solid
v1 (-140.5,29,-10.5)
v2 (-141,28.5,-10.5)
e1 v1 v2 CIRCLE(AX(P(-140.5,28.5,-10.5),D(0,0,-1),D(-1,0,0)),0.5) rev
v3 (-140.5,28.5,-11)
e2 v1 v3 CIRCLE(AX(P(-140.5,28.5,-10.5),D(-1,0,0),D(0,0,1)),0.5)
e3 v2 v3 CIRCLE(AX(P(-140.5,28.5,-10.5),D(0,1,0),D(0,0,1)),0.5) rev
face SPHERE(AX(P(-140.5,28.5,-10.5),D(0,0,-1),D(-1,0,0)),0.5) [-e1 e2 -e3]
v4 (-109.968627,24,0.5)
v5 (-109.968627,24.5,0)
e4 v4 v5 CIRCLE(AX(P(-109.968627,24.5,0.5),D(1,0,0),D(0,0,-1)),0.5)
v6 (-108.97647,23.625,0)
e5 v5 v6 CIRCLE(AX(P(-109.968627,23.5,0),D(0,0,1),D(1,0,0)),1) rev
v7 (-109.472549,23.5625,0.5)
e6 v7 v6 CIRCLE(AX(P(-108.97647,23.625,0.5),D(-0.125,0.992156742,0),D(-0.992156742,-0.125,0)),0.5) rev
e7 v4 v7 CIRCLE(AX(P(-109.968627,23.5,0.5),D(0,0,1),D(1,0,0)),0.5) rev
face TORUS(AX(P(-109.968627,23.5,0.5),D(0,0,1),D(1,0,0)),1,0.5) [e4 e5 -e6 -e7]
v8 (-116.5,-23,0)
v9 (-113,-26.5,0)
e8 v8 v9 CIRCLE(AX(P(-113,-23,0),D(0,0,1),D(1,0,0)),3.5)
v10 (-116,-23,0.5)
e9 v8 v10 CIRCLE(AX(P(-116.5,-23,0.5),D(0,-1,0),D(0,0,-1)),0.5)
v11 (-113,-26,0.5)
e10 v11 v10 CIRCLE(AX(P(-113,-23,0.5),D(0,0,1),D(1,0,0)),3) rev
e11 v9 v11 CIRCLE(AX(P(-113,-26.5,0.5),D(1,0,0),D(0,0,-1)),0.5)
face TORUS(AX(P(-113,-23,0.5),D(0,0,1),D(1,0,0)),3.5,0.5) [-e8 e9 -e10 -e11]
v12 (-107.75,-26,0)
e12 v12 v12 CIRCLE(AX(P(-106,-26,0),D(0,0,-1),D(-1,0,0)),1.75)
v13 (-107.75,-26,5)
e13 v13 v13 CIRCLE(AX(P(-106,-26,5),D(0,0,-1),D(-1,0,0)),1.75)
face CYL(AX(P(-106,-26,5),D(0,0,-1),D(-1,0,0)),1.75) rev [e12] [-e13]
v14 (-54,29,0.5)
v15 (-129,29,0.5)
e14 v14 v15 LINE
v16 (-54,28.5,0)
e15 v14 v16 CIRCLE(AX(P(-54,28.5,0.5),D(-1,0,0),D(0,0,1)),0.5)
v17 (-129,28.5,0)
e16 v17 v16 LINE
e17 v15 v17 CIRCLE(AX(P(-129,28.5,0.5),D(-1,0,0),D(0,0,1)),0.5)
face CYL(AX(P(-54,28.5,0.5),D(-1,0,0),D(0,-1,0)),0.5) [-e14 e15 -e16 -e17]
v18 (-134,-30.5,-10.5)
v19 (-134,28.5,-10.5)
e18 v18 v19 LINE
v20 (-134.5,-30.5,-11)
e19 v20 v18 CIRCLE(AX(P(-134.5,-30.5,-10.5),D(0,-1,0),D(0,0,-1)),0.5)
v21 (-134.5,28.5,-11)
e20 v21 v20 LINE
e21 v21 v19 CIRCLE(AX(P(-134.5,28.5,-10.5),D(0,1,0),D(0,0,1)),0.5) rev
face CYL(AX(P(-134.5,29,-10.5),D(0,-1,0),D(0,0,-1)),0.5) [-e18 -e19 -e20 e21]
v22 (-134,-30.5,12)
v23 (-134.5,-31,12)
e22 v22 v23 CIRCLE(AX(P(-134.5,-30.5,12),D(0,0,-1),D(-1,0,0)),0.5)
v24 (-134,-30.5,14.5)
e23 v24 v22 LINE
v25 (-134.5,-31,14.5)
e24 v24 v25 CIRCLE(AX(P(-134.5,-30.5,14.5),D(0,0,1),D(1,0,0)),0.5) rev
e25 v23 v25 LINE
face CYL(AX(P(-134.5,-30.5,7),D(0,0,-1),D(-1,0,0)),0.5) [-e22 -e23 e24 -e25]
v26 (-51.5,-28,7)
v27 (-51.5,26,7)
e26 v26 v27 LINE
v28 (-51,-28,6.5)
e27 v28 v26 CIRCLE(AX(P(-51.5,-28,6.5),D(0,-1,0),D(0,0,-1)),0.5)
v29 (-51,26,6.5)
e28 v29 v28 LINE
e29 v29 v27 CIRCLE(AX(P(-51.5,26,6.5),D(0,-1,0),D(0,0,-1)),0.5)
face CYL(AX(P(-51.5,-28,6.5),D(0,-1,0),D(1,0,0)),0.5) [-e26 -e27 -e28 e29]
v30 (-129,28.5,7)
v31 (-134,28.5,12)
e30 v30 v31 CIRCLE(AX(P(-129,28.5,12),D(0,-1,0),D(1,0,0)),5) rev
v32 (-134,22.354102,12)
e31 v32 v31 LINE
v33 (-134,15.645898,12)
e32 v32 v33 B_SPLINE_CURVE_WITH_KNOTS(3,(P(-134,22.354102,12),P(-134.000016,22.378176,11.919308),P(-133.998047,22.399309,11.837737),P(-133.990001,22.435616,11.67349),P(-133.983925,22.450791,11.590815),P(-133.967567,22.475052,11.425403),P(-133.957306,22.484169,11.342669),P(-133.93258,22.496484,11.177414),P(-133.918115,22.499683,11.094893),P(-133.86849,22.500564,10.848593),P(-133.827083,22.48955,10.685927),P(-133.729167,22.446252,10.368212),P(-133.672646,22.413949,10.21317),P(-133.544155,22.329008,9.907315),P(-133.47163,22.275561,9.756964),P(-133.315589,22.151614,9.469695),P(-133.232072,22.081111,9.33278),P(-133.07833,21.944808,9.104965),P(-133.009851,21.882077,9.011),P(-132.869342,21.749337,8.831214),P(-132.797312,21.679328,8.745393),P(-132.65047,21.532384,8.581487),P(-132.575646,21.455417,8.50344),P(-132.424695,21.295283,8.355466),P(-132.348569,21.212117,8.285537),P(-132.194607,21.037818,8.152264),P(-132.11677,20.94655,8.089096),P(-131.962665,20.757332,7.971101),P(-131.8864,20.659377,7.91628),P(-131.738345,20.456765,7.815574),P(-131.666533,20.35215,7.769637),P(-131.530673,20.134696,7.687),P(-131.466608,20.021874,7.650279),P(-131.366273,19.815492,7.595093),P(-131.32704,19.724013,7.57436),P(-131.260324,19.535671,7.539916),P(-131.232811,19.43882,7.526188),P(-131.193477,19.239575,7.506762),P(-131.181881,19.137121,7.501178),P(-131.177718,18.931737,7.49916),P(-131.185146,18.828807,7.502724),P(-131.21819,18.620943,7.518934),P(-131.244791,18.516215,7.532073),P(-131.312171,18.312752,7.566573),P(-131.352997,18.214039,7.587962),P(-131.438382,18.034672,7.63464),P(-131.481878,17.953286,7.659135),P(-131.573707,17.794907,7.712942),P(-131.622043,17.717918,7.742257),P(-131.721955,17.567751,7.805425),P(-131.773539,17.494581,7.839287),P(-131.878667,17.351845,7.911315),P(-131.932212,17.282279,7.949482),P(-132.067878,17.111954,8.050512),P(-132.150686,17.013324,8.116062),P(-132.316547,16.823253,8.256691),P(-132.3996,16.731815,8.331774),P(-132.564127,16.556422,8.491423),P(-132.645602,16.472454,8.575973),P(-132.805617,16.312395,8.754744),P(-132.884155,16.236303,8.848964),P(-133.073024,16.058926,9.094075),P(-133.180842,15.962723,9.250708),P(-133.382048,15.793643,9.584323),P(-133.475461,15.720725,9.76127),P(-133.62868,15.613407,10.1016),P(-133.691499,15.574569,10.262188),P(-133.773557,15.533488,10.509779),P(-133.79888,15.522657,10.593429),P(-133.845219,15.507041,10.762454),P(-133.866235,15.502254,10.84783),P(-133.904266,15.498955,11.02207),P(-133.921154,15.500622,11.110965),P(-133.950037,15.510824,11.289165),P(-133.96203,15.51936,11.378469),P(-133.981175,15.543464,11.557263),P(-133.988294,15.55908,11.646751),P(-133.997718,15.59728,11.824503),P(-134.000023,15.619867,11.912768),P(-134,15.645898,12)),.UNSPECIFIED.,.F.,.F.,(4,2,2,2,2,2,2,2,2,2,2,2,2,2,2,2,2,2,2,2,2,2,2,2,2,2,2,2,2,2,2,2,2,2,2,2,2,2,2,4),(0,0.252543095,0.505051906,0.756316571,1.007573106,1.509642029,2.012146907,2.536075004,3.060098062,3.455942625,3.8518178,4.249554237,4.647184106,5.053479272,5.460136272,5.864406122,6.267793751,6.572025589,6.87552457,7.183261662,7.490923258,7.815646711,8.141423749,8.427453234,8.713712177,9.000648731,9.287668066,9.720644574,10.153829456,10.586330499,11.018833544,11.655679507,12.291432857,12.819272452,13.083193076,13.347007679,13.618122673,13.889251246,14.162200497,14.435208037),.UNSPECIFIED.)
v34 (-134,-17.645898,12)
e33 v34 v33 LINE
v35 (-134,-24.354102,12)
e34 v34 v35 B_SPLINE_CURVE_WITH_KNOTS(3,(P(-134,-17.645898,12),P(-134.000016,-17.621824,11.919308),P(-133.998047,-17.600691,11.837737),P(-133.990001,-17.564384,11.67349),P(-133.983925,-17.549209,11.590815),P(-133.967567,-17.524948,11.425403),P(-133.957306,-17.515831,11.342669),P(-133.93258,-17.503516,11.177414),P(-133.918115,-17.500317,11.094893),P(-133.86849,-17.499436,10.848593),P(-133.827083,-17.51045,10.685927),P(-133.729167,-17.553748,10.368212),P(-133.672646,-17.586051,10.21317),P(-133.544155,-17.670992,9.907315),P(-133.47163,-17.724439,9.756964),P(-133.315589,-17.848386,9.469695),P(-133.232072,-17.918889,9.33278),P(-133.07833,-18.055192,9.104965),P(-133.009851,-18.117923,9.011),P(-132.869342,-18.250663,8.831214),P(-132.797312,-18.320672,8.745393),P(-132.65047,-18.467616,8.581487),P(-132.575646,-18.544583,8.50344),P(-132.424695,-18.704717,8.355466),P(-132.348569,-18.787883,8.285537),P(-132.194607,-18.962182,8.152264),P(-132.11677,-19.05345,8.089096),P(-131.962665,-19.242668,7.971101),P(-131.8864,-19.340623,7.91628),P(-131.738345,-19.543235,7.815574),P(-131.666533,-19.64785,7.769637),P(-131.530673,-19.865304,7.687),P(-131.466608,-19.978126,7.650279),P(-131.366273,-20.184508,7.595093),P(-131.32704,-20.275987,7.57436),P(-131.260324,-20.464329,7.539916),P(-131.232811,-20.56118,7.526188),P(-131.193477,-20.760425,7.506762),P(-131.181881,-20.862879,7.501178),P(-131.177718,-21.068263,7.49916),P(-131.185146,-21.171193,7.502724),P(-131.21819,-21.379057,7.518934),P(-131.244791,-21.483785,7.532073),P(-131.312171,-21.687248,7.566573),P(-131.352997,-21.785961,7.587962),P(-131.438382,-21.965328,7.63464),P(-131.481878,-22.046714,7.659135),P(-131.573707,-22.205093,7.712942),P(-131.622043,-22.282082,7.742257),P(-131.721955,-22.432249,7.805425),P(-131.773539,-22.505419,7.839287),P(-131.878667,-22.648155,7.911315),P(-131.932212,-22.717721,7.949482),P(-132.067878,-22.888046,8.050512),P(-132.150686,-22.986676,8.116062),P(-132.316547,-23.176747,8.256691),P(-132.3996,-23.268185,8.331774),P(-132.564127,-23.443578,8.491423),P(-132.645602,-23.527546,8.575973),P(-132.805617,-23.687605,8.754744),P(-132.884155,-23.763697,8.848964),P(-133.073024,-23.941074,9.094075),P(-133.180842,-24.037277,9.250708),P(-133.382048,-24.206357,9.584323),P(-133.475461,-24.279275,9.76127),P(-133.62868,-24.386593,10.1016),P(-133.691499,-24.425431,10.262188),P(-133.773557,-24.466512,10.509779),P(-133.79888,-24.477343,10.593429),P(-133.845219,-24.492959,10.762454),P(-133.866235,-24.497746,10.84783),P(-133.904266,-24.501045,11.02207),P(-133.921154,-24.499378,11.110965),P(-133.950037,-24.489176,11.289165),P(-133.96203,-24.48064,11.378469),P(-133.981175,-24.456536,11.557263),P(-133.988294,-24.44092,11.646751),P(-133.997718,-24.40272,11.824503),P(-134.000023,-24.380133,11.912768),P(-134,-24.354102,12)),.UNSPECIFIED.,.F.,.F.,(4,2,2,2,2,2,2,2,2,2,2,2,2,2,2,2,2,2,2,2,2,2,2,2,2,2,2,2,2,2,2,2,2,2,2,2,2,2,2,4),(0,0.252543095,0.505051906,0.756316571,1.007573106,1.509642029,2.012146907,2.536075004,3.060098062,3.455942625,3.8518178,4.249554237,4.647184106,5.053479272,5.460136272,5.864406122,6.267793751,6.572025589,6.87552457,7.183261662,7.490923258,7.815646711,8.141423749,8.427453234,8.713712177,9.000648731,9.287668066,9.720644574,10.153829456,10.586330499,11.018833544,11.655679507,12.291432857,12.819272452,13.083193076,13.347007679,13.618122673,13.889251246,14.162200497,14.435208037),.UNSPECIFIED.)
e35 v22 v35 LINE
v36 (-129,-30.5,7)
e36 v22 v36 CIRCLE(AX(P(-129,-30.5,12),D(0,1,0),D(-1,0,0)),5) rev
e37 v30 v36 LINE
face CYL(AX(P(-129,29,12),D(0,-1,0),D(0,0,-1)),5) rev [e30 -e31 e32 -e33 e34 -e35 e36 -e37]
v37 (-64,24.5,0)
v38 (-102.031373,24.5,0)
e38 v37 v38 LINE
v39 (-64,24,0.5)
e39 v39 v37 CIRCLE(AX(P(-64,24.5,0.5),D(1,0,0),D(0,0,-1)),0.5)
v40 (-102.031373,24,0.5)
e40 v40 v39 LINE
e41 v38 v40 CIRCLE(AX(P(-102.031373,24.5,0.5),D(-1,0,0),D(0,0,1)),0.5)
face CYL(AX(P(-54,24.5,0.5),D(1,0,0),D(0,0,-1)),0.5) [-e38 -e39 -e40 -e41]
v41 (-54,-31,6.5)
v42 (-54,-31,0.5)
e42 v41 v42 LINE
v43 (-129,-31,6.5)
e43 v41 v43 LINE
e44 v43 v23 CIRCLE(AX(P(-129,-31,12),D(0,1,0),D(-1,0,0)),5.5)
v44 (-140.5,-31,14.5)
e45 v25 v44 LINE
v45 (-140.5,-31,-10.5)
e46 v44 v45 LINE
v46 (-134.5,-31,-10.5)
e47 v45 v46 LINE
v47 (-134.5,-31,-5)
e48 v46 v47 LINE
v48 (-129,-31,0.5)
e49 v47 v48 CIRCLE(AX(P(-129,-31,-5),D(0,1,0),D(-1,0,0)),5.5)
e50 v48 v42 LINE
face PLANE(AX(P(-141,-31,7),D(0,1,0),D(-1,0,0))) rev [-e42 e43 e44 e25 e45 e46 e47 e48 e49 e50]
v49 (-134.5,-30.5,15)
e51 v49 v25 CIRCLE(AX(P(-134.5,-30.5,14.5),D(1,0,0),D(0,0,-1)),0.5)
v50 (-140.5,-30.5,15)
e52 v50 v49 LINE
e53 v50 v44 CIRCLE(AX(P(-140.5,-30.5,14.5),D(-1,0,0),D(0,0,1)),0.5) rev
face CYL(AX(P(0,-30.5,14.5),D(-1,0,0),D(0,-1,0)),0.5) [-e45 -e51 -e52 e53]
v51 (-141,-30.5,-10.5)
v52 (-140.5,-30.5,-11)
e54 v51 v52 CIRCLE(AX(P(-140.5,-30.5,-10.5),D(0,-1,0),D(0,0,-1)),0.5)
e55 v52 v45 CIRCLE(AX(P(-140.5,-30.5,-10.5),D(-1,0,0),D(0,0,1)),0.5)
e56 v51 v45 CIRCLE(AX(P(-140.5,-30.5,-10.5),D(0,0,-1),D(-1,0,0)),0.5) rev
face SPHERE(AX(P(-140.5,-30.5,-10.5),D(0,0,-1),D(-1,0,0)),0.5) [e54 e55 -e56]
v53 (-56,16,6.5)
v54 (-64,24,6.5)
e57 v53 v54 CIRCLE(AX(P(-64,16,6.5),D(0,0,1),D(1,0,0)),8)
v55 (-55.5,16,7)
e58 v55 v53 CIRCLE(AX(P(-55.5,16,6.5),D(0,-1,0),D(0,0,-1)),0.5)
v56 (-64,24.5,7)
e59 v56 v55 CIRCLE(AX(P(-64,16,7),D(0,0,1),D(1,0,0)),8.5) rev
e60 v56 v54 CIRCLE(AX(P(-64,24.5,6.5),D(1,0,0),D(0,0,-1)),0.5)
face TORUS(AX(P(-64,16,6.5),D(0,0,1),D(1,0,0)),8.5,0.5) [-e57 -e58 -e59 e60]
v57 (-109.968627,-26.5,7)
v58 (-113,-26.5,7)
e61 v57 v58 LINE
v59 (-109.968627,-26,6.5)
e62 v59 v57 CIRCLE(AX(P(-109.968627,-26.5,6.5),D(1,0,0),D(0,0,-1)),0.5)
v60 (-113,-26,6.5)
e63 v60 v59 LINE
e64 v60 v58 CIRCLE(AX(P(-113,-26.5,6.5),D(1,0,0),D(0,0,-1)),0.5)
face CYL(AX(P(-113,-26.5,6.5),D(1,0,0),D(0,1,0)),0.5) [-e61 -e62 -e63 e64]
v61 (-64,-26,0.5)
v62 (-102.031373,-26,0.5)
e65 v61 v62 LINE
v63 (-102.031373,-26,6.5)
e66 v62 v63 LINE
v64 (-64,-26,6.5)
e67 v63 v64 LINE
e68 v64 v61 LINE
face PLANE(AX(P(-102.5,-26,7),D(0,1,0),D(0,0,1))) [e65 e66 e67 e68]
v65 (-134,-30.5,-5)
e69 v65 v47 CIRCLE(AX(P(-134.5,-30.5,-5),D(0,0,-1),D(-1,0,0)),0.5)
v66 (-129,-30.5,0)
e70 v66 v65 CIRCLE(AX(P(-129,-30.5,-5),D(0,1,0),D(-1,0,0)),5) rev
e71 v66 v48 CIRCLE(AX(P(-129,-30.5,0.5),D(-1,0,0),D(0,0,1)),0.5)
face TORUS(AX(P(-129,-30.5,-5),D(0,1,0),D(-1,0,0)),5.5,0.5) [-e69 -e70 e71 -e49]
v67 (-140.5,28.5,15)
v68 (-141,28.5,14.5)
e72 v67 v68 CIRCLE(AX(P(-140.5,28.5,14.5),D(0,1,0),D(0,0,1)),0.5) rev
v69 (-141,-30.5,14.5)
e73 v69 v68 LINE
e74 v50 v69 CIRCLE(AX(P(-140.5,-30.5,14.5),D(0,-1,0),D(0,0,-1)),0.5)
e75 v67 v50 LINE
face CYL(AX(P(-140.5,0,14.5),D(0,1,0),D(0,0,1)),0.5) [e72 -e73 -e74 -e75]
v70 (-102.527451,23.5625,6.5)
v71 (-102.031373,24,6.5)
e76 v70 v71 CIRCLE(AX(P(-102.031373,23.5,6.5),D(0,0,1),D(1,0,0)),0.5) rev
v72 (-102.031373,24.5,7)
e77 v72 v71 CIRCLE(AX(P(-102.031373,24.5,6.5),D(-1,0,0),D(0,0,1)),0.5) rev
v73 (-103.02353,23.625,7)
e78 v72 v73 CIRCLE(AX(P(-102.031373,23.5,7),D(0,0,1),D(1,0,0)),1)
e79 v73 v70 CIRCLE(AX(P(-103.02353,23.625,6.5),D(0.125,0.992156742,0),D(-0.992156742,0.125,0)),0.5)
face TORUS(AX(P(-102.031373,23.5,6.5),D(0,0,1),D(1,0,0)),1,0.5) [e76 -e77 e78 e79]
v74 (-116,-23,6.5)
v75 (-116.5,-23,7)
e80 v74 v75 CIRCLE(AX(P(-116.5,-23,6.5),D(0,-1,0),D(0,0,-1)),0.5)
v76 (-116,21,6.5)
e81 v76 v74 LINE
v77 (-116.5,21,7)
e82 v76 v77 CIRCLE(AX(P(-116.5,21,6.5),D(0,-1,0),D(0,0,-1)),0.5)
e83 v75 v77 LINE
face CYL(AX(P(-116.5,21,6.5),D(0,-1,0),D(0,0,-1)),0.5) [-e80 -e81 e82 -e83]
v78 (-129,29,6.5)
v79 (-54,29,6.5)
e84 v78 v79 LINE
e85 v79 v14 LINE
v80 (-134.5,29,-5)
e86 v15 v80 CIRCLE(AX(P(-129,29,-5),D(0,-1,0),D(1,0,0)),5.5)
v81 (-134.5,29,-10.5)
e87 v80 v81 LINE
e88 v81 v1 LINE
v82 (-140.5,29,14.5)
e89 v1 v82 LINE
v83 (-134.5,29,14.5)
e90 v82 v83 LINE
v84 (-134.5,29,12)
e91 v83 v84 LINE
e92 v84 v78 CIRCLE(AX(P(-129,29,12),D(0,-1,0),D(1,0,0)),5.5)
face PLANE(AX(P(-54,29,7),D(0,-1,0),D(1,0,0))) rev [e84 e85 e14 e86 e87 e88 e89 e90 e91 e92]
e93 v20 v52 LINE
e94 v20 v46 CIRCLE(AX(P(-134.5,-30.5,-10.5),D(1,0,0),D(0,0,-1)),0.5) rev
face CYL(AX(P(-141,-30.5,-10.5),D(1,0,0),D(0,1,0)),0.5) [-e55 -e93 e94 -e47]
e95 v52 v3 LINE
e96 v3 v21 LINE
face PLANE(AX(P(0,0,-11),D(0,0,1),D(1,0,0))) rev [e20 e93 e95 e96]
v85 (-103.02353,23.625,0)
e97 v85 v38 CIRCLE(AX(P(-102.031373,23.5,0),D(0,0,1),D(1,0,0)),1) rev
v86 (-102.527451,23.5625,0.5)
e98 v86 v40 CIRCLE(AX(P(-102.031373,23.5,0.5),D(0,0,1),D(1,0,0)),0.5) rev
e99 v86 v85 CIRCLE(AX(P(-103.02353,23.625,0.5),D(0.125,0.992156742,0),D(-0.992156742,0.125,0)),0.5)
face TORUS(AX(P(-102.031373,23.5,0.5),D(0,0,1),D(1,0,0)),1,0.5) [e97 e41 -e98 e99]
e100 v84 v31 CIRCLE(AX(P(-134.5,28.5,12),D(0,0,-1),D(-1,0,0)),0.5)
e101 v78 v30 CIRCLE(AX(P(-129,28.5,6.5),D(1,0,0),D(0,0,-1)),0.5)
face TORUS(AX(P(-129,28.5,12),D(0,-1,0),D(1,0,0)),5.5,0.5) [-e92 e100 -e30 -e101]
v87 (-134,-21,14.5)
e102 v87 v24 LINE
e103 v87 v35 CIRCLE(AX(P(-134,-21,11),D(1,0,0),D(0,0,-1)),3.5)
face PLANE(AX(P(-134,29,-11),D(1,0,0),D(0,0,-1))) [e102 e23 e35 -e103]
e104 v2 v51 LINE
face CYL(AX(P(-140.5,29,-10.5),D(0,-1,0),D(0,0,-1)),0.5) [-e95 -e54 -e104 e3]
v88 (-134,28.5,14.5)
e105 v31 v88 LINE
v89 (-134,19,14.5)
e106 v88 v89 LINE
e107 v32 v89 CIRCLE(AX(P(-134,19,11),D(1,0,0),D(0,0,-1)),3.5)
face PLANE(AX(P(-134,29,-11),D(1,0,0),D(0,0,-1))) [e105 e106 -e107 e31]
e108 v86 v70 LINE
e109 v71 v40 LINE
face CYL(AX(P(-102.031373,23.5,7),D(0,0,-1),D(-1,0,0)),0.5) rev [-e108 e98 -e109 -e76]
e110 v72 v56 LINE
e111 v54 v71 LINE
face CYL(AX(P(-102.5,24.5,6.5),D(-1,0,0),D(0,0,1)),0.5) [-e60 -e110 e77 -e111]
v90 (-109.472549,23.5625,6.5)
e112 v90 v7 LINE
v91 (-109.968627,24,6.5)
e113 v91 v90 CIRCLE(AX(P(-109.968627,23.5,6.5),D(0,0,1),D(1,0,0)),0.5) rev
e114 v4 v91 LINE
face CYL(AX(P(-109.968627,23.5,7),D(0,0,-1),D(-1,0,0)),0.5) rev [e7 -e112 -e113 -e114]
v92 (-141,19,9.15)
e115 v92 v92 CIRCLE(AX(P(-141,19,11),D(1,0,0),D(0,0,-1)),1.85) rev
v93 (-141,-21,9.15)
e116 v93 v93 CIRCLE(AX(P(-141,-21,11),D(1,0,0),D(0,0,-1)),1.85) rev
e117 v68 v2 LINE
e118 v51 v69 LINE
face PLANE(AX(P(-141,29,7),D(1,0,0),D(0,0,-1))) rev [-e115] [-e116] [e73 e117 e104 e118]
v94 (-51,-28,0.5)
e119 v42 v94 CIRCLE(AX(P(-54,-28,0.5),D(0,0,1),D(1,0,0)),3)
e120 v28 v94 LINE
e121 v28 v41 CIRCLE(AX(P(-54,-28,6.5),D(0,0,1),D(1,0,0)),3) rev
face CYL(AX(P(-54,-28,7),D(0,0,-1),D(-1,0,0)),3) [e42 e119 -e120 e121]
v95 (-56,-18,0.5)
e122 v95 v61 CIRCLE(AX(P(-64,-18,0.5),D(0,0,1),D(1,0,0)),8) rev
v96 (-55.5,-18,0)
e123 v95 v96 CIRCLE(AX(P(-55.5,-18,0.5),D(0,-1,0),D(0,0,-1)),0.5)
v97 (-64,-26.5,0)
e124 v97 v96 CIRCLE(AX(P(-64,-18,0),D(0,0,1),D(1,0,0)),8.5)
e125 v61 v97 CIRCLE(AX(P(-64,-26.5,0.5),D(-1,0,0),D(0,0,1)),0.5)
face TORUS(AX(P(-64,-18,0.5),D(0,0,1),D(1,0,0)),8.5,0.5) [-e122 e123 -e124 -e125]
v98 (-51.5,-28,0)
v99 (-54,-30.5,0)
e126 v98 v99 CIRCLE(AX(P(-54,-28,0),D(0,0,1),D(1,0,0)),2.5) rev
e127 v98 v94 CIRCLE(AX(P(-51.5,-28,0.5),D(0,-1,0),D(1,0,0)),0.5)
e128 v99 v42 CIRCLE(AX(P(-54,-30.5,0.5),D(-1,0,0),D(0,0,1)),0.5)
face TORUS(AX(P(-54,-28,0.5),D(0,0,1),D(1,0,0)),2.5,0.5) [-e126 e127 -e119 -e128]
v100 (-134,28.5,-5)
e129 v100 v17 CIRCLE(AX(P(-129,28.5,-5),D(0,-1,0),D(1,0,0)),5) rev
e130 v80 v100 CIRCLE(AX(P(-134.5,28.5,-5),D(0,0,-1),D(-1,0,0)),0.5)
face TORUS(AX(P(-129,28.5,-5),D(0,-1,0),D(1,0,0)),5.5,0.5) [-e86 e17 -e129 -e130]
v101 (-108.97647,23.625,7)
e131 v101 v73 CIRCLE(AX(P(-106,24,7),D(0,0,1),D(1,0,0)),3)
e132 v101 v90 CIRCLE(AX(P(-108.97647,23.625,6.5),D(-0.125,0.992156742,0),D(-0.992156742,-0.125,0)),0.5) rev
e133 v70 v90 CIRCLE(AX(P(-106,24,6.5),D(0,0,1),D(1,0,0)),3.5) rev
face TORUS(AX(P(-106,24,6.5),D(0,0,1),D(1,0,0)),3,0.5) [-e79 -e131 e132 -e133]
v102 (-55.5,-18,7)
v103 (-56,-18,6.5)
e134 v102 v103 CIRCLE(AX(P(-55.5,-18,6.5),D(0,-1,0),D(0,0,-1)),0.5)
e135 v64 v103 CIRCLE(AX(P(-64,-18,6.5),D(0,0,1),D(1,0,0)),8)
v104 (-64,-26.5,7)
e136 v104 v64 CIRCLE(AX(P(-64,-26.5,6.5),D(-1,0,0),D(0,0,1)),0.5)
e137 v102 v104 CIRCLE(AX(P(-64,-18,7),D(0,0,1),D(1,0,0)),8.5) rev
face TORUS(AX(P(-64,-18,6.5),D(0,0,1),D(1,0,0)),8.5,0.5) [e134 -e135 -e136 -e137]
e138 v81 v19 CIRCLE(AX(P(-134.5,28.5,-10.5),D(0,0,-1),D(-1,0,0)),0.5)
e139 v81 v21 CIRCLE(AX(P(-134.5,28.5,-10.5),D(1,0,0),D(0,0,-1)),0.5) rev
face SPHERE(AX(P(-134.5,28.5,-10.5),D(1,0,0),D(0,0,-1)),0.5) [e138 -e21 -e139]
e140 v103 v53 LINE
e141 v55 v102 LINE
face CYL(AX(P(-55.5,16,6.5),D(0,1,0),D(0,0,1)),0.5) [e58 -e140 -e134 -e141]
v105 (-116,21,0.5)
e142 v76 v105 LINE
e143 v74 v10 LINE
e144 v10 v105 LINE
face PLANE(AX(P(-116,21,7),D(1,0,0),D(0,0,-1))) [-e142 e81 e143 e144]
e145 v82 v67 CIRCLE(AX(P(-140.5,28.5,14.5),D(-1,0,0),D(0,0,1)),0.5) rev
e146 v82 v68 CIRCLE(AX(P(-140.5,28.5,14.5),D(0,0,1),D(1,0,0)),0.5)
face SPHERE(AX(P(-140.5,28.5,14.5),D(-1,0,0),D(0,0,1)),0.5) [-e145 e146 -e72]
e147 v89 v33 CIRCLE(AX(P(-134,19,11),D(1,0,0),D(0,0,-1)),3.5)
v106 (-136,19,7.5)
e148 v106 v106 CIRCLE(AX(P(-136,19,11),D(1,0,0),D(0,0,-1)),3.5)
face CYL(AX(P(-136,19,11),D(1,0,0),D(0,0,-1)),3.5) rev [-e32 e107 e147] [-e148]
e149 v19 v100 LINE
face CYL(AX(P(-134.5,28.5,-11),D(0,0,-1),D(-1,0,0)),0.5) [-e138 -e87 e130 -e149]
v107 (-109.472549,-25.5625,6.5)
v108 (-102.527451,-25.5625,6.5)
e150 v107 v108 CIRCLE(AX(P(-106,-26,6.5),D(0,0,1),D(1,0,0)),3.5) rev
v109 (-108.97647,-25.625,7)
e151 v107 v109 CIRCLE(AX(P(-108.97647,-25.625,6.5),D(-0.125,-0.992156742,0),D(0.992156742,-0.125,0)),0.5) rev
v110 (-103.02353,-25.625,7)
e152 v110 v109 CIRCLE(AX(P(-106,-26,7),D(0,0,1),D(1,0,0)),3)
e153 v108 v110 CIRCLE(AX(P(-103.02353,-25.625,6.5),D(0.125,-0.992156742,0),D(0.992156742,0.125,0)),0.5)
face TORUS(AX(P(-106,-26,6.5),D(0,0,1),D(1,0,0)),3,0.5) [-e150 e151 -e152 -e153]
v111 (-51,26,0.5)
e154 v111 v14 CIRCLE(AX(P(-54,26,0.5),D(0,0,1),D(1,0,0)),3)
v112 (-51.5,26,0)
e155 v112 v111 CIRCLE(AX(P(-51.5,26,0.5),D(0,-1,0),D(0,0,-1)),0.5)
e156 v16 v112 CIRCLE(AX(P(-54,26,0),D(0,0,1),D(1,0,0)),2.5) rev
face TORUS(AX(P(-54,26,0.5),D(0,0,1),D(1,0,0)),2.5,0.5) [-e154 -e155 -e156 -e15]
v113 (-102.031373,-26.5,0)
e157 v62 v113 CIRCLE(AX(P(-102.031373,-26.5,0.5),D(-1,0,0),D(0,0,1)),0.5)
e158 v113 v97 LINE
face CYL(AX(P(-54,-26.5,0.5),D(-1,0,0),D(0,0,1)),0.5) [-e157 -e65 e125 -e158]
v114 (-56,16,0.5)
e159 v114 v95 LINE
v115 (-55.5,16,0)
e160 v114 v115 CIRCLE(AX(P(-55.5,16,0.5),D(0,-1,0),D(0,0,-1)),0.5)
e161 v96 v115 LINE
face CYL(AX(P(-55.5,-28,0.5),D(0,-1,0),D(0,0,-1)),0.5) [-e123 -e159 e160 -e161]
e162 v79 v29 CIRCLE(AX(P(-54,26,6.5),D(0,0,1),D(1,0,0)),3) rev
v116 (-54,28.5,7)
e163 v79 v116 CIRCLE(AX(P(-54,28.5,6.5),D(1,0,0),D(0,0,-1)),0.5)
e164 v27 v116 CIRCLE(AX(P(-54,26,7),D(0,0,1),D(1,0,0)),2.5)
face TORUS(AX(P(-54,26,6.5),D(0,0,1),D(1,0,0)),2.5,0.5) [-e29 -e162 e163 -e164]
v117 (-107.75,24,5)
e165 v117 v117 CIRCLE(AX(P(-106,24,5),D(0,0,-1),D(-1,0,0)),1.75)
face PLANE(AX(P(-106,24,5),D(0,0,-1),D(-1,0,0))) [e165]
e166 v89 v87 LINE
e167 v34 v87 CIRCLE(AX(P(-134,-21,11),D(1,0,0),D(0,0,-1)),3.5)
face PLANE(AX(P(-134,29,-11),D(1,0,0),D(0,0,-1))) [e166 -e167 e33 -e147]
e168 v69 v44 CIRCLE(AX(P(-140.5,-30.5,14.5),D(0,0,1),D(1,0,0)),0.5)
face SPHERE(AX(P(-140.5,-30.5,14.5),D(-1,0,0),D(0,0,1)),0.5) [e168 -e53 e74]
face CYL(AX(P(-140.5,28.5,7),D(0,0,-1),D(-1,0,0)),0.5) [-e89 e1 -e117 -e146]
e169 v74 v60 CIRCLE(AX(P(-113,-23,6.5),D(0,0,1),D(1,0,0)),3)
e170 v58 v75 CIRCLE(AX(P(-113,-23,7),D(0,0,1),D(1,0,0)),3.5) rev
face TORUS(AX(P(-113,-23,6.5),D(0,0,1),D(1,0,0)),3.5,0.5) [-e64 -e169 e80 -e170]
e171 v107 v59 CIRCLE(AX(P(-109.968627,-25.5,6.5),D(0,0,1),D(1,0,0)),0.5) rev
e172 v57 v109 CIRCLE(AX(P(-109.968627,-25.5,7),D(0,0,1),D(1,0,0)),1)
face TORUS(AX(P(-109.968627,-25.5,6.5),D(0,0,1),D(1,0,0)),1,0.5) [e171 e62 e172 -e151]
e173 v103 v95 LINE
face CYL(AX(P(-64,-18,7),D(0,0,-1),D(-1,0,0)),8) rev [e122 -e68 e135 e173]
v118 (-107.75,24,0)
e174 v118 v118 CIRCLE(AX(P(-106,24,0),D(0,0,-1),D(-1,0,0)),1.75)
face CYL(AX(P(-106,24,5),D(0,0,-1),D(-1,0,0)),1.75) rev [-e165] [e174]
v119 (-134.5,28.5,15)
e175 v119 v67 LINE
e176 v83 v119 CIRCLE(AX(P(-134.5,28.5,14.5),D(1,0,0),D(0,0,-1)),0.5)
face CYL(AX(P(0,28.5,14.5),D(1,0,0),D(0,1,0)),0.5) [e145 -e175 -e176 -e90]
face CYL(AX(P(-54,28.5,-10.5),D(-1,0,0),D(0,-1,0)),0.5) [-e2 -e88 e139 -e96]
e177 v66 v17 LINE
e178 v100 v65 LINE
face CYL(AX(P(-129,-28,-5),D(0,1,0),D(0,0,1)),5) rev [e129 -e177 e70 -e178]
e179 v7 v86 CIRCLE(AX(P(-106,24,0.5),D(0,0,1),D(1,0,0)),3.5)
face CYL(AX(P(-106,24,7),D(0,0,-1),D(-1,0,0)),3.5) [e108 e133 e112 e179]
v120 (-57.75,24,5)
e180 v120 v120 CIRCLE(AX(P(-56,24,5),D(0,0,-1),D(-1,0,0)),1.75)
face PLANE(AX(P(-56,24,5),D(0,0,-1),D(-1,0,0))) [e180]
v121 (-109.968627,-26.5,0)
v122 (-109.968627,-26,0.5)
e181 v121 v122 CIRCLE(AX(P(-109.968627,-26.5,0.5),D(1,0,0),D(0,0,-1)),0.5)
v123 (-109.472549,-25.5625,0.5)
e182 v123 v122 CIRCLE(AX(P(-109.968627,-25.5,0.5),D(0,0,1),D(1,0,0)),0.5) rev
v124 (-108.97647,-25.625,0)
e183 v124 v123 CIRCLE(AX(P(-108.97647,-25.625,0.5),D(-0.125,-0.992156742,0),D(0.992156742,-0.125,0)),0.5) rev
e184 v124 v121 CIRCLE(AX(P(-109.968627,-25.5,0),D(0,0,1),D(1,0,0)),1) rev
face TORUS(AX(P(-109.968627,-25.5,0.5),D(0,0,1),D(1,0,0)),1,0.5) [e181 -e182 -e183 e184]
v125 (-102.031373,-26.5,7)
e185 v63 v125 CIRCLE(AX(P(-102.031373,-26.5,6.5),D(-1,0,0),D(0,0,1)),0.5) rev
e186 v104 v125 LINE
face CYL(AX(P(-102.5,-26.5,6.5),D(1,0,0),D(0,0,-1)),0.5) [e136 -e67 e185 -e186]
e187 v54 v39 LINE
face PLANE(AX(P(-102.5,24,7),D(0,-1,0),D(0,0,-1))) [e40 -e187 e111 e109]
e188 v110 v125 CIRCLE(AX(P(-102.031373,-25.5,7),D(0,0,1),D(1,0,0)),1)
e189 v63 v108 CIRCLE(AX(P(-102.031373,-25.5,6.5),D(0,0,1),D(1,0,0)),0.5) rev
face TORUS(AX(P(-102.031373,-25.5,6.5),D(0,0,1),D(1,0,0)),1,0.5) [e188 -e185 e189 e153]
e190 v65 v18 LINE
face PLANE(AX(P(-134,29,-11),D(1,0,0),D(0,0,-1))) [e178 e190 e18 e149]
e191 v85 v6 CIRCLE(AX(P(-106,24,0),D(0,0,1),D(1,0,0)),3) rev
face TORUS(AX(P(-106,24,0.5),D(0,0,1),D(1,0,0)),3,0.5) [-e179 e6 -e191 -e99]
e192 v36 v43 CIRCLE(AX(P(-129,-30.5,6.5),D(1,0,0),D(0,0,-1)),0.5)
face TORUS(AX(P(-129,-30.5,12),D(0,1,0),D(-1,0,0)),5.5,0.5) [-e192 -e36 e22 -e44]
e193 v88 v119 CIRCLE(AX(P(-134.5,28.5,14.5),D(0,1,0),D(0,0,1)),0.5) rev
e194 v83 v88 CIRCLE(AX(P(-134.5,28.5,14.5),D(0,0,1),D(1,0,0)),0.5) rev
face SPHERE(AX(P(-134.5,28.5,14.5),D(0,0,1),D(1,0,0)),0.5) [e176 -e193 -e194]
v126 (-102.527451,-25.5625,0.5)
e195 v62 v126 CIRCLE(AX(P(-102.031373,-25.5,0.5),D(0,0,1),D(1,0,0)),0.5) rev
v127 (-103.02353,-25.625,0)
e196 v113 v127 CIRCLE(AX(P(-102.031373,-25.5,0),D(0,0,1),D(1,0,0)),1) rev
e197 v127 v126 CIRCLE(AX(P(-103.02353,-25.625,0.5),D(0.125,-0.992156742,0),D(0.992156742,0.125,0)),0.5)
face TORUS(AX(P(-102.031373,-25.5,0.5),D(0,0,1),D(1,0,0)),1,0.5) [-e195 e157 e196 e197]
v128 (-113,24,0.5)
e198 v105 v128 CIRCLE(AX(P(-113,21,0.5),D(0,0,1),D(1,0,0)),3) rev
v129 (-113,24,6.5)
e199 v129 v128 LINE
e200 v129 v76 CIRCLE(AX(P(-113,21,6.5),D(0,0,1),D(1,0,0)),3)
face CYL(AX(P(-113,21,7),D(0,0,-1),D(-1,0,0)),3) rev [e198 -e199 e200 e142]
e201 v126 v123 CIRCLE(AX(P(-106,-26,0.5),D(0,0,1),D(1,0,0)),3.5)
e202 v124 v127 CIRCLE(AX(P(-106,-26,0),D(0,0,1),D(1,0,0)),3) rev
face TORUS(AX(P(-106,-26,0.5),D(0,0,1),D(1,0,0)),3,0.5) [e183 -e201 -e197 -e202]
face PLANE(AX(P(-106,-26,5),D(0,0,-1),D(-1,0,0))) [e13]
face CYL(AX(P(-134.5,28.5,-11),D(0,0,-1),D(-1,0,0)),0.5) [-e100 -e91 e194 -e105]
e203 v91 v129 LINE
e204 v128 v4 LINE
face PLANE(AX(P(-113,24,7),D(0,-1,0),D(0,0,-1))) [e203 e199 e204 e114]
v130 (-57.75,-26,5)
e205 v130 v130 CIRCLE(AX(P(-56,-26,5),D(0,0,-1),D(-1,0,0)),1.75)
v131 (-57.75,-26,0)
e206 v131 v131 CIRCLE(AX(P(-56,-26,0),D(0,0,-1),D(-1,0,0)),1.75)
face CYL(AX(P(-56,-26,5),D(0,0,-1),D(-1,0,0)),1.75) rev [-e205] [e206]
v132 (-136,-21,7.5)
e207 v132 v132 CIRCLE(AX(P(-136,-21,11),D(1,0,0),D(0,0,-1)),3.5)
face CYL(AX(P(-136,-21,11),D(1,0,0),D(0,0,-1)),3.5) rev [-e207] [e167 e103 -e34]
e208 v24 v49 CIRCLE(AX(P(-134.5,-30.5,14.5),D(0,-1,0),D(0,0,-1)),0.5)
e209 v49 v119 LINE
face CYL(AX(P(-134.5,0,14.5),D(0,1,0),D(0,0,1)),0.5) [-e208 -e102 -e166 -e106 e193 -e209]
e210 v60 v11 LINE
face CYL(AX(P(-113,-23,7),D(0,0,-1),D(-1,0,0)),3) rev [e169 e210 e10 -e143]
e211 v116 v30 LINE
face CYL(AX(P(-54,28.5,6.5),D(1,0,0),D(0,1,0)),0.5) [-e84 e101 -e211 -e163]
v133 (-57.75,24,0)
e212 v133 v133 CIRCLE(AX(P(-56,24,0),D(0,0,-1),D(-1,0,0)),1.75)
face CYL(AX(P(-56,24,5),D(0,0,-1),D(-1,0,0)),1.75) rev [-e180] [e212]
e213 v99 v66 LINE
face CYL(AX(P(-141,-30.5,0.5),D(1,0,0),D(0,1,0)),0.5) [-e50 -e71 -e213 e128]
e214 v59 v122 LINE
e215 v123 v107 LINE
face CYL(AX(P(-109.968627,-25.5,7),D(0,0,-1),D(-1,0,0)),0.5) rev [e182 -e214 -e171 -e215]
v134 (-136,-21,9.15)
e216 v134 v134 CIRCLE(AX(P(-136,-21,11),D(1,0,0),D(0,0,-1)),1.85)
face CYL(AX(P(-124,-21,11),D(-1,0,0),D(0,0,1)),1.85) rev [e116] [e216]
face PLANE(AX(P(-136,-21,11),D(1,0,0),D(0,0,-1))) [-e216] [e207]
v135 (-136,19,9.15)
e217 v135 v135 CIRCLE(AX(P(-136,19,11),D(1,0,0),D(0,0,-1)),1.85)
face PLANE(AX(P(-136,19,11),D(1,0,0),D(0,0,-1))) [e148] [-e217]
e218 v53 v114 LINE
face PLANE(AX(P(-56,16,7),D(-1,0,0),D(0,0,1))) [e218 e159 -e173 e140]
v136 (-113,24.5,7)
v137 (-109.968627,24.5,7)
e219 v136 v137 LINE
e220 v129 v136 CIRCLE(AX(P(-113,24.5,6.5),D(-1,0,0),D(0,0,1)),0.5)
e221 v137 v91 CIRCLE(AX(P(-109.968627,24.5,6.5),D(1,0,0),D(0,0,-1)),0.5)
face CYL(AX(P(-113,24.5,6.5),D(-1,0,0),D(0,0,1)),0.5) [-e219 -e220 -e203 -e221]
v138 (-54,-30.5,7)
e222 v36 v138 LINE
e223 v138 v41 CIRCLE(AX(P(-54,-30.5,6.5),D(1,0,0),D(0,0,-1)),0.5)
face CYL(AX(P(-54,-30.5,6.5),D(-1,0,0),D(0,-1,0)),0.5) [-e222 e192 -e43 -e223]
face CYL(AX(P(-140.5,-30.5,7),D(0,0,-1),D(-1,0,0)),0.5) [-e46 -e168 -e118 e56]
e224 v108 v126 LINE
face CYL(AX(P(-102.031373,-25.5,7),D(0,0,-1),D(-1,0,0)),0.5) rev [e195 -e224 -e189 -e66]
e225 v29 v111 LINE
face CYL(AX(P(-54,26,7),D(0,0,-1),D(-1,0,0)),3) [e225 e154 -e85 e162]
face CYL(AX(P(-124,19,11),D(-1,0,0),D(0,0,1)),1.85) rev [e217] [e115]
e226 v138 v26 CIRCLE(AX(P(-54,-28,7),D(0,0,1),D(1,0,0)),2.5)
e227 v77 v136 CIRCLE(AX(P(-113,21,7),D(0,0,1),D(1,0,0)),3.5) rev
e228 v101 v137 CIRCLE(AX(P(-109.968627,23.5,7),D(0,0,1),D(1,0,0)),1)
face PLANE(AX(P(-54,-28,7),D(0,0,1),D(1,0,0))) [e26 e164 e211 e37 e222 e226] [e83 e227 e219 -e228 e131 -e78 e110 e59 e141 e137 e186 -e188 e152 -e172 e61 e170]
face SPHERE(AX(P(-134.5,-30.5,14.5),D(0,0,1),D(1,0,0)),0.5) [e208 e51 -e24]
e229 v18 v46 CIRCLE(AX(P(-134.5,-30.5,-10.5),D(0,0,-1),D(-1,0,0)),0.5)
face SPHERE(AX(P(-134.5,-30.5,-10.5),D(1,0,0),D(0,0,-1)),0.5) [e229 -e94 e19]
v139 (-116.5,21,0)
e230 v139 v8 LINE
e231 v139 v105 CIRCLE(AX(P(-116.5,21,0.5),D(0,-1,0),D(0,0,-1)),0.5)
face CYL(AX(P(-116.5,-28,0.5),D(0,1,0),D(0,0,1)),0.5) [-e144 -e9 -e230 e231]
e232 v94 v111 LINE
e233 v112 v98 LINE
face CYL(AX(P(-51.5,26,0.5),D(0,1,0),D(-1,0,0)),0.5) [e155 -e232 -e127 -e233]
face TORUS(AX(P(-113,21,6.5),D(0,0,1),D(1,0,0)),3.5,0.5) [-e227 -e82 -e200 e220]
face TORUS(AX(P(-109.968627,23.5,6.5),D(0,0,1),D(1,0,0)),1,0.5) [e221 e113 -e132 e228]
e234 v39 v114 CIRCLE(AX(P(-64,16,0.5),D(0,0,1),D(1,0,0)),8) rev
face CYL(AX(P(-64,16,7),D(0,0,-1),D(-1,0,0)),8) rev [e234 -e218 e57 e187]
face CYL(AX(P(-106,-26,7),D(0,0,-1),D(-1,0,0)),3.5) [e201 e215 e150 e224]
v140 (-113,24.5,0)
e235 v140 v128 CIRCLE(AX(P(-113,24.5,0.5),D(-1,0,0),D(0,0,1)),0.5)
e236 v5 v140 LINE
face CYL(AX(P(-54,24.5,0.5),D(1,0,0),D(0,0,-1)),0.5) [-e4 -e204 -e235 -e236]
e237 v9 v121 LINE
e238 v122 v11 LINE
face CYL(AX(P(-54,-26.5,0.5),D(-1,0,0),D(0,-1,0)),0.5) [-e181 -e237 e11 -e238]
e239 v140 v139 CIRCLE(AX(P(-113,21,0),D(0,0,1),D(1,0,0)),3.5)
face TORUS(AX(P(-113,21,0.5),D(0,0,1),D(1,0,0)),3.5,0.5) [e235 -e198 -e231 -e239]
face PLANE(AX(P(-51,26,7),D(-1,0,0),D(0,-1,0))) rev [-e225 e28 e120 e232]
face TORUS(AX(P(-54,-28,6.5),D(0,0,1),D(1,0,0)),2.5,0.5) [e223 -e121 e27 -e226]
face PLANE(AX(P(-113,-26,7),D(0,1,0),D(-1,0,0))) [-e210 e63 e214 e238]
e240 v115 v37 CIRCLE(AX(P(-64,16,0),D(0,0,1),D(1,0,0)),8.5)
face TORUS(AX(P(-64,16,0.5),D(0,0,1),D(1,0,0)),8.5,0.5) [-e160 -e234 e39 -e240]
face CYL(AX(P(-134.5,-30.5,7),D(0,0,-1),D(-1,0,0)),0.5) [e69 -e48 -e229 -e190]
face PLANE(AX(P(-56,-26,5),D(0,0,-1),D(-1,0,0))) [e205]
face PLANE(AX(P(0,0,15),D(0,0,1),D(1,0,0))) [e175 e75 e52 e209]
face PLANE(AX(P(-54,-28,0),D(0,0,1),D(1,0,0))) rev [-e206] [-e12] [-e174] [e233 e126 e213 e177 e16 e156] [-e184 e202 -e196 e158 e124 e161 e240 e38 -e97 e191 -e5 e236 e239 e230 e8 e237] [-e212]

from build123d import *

# Parameters (mm, degrees)
BOSS_EXTRUDE1_DEPTH      = 7
BOSS_EXTRUDE2_DEPTH      = 8
BOSS_EXTRUDE2_DEPTH_BACK = 18
SKETCH2_W                = 7
SKETCH2_H                = 60
FILLET1_R                = 5
CUT_EXTRUDE1_DEPTH       = 10
CUT_EXTRUDE1_DEPTH_BACK  = 10
SKETCH3_R                = 1.85
CUT_EXTRUDE2_DEPTH       = 10
CUT_EXTRUDE2_DEPTH_BACK  = 2
SKETCH4_R                = 3.5
FILLET2_R                = 0.5
FILLET3_R                = 0.5
SKETCH5_R                = 1.75
CUT_EXTRUDE3_DEPTH       = 5


with BuildPart() as part:
    # Sketch1 → Boss-Extrude1 (new body)
    with BuildSketch(Plane.XY):
        with BuildLine():
            Line((-141, -31), (-54, -31))
            ThreePointArc((-54, -31), (-51.878679656, -30.121320344), (-51, -28))
            Line((-51, -28), (-51, 26))
            ThreePointArc((-51, 26), (-51.878679656, 28.121320344), (-54, 29))
            Line((-54, 29), (-141, 29))
            Line((-141, 29), (-141, -31))
        make_face()
        with BuildLine():
            Line((-113, 24), (-109.5, 24))
            ThreePointArc((-109.5, 24), (-106, 20.5), (-102.5, 24))
            Line((-102.5, 24), (-64, 24))
            ThreePointArc((-64, 24), (-58.343145751, 21.65685425), (-56, 16))
            Line((-56, 16), (-56, -18))
            ThreePointArc((-56, -18), (-58.343145751, -23.656854249), (-64, -26))
            Line((-64, -26), (-102.5, -26))
            ThreePointArc((-102.5, -26), (-106, -22.5), (-109.5, -26))
            Line((-109.5, -26), (-113, -26))
            ThreePointArc((-113, -26), (-115.121320344, -25.121320344), (-116, -23))
            Line((-116, -23), (-116, 21))
            ThreePointArc((-116, 21), (-115.121320344, 23.121320344), (-113, 24))
        make_face(mode=Mode.SUBTRACT)
    extrude(amount=BOSS_EXTRUDE1_DEPTH)

    # Sketch2 → Boss-Extrude2 (add, two sides: drawn at the far end of the back side and taken through both)
    with BuildSketch(Plane.XY.offset(7).offset(-BOSS_EXTRUDE2_DEPTH_BACK)):
        with Locations((-137.5, -1)):
            Rectangle(SKETCH2_W, SKETCH2_H)
    extrude(amount=BOSS_EXTRUDE2_DEPTH + BOSS_EXTRUDE2_DEPTH_BACK)

    # Fillet1
    fillet1_edges = [part.edges().sort_by_distance(p)[0] for p in [
        (-134, -1, 0),
        (-134, -1, 7),
    ]]
    fillet(fillet1_edges, radius=FILLET1_R)

    # Sketch3 → Cut-Extrude1 (cut, two sides: drawn at the far end of the back side and taken through both)
    with BuildSketch(Plane(origin=(-134, 0, 0), x_dir=(0, 0, -1), z_dir=(1, 0, 0)).offset(-CUT_EXTRUDE1_DEPTH_BACK)):
        with Locations(Location((-11, 19, 0), (0, 0, 237.279556634))):
            Circle(SKETCH3_R)
        with Locations(Location((-11, -21, 0), (0, 0, 237.279556634))):
            Circle(SKETCH3_R)
    extrude(amount=CUT_EXTRUDE1_DEPTH + CUT_EXTRUDE1_DEPTH_BACK, mode=Mode.SUBTRACT)

    # Sketch4 → Cut-Extrude2 (cut, two sides: drawn at the far end of the back side and taken through both)
    with BuildSketch(Plane(origin=(-134, 0, 0), x_dir=(0, 0, -1), z_dir=(1, 0, 0)).offset(-CUT_EXTRUDE2_DEPTH_BACK)):
        with Locations((-11, -21)):
            Circle(SKETCH4_R)
        with Locations((-11, 19)):
            Circle(SKETCH4_R)
    extrude(amount=CUT_EXTRUDE2_DEPTH + CUT_EXTRUDE2_DEPTH_BACK, mode=Mode.SUBTRACT)

    # Fillet2
    fillet2_edges = [part.edges().sort_by_distance(p)[0] for p in [
        (-141, -31, 2),
        (-141, 29, 2),
        (-51.878679656, 28.121320344, 7),
        (-91.5, 29, 7),
        (-51.878679656, -30.121320344, 7),
        (-137.5, 29, -11),
        (-137.5, -31, -11),
        (-134, -31, -8),
        (-141, -1, -11),
        (-134, -1, -11),
        (-134, 29, -8),
        (-141, -1, 15),
        (-137.5, -31, 15),
        (-134, -1, 15),
        (-137.5, 29, 15),
        (-91.5, 29, 0),
        (-51.878679656, 28.121320344, 0),
        (-51, -1, 0),
        (-134, -31, 13.5),
        (-134, 29, 13.5),
        (-91.5, -31, 7),
        (-91.5, -31, 0),
        (-51.878679656, -30.121320344, 0),
        (-132.535533906, 29, 8.464466094),
        (-132.535533906, -31, 8.464466094),
        (-51, -1, 7),
        (-132.535533906, 29, -1.464466094),
        (-132.535533906, -31, -1.464466094),
    ]]
    fillet(fillet2_edges, radius=FILLET2_R - 0.0001)  # a hair under: the kernel refuses the full size

    # Fillet3
    fillet3_edges = [part.edges().sort_by_distance(p)[0] for p in [
        (-115.121320344, -25.121320344, 0),
        (-111.25, -26, 0),
        (-106, -22.5, 0),
        (-109.5, -26, 3.5),
        (-83.25, -26, 0),
        (-102.5, -26, 3.5),
        (-58.343145751, -23.656854249, 0),
        (-56, -1, 0),
        (-58.343145751, 21.65685425, 0),
        (-83.25, 24, 0),
        (-106, 20.5, 0),
        (-102.5, 24, 3.5),
        (-111.25, 24, 0),
        (-109.5, 24, 3.5),
        (-115.121320344, 23.121320344, 0),
        (-116, -1, 0),
        (-115.121320344, -25.121320344, 7),
        (-111.25, -26, 7),
        (-106, -22.5, 7),
        (-83.25, -26, 7),
        (-58.343145751, -23.656854249, 7),
        (-56, -1, 7),
        (-58.343145751, 21.65685425, 7),
        (-83.25, 24, 7),
        (-106, 20.5, 7),
        (-111.25, 24, 7),
        (-115.121320344, 23.121320344, 7),
        (-116, -1, 7),
    ]]
    fillet(fillet3_edges, radius=FILLET3_R)

    # Sketch5 → Cut-Extrude3 (cut)
    with BuildSketch(Plane(origin=(0, 0, 0), x_dir=(-1, 0, 0), z_dir=(0, 0, -1))):
        with Locations((106, -26)):
            Circle(SKETCH5_R)
        with Locations((56, -26)):
            Circle(SKETCH5_R)
        with Locations((56, 24)):
            Circle(SKETCH5_R)
        with Locations((106, 24)):
            Circle(SKETCH5_R)
    extrude(amount=-CUT_EXTRUDE3_DEPTH, mode=Mode.SUBTRACT)


solid = part.part
